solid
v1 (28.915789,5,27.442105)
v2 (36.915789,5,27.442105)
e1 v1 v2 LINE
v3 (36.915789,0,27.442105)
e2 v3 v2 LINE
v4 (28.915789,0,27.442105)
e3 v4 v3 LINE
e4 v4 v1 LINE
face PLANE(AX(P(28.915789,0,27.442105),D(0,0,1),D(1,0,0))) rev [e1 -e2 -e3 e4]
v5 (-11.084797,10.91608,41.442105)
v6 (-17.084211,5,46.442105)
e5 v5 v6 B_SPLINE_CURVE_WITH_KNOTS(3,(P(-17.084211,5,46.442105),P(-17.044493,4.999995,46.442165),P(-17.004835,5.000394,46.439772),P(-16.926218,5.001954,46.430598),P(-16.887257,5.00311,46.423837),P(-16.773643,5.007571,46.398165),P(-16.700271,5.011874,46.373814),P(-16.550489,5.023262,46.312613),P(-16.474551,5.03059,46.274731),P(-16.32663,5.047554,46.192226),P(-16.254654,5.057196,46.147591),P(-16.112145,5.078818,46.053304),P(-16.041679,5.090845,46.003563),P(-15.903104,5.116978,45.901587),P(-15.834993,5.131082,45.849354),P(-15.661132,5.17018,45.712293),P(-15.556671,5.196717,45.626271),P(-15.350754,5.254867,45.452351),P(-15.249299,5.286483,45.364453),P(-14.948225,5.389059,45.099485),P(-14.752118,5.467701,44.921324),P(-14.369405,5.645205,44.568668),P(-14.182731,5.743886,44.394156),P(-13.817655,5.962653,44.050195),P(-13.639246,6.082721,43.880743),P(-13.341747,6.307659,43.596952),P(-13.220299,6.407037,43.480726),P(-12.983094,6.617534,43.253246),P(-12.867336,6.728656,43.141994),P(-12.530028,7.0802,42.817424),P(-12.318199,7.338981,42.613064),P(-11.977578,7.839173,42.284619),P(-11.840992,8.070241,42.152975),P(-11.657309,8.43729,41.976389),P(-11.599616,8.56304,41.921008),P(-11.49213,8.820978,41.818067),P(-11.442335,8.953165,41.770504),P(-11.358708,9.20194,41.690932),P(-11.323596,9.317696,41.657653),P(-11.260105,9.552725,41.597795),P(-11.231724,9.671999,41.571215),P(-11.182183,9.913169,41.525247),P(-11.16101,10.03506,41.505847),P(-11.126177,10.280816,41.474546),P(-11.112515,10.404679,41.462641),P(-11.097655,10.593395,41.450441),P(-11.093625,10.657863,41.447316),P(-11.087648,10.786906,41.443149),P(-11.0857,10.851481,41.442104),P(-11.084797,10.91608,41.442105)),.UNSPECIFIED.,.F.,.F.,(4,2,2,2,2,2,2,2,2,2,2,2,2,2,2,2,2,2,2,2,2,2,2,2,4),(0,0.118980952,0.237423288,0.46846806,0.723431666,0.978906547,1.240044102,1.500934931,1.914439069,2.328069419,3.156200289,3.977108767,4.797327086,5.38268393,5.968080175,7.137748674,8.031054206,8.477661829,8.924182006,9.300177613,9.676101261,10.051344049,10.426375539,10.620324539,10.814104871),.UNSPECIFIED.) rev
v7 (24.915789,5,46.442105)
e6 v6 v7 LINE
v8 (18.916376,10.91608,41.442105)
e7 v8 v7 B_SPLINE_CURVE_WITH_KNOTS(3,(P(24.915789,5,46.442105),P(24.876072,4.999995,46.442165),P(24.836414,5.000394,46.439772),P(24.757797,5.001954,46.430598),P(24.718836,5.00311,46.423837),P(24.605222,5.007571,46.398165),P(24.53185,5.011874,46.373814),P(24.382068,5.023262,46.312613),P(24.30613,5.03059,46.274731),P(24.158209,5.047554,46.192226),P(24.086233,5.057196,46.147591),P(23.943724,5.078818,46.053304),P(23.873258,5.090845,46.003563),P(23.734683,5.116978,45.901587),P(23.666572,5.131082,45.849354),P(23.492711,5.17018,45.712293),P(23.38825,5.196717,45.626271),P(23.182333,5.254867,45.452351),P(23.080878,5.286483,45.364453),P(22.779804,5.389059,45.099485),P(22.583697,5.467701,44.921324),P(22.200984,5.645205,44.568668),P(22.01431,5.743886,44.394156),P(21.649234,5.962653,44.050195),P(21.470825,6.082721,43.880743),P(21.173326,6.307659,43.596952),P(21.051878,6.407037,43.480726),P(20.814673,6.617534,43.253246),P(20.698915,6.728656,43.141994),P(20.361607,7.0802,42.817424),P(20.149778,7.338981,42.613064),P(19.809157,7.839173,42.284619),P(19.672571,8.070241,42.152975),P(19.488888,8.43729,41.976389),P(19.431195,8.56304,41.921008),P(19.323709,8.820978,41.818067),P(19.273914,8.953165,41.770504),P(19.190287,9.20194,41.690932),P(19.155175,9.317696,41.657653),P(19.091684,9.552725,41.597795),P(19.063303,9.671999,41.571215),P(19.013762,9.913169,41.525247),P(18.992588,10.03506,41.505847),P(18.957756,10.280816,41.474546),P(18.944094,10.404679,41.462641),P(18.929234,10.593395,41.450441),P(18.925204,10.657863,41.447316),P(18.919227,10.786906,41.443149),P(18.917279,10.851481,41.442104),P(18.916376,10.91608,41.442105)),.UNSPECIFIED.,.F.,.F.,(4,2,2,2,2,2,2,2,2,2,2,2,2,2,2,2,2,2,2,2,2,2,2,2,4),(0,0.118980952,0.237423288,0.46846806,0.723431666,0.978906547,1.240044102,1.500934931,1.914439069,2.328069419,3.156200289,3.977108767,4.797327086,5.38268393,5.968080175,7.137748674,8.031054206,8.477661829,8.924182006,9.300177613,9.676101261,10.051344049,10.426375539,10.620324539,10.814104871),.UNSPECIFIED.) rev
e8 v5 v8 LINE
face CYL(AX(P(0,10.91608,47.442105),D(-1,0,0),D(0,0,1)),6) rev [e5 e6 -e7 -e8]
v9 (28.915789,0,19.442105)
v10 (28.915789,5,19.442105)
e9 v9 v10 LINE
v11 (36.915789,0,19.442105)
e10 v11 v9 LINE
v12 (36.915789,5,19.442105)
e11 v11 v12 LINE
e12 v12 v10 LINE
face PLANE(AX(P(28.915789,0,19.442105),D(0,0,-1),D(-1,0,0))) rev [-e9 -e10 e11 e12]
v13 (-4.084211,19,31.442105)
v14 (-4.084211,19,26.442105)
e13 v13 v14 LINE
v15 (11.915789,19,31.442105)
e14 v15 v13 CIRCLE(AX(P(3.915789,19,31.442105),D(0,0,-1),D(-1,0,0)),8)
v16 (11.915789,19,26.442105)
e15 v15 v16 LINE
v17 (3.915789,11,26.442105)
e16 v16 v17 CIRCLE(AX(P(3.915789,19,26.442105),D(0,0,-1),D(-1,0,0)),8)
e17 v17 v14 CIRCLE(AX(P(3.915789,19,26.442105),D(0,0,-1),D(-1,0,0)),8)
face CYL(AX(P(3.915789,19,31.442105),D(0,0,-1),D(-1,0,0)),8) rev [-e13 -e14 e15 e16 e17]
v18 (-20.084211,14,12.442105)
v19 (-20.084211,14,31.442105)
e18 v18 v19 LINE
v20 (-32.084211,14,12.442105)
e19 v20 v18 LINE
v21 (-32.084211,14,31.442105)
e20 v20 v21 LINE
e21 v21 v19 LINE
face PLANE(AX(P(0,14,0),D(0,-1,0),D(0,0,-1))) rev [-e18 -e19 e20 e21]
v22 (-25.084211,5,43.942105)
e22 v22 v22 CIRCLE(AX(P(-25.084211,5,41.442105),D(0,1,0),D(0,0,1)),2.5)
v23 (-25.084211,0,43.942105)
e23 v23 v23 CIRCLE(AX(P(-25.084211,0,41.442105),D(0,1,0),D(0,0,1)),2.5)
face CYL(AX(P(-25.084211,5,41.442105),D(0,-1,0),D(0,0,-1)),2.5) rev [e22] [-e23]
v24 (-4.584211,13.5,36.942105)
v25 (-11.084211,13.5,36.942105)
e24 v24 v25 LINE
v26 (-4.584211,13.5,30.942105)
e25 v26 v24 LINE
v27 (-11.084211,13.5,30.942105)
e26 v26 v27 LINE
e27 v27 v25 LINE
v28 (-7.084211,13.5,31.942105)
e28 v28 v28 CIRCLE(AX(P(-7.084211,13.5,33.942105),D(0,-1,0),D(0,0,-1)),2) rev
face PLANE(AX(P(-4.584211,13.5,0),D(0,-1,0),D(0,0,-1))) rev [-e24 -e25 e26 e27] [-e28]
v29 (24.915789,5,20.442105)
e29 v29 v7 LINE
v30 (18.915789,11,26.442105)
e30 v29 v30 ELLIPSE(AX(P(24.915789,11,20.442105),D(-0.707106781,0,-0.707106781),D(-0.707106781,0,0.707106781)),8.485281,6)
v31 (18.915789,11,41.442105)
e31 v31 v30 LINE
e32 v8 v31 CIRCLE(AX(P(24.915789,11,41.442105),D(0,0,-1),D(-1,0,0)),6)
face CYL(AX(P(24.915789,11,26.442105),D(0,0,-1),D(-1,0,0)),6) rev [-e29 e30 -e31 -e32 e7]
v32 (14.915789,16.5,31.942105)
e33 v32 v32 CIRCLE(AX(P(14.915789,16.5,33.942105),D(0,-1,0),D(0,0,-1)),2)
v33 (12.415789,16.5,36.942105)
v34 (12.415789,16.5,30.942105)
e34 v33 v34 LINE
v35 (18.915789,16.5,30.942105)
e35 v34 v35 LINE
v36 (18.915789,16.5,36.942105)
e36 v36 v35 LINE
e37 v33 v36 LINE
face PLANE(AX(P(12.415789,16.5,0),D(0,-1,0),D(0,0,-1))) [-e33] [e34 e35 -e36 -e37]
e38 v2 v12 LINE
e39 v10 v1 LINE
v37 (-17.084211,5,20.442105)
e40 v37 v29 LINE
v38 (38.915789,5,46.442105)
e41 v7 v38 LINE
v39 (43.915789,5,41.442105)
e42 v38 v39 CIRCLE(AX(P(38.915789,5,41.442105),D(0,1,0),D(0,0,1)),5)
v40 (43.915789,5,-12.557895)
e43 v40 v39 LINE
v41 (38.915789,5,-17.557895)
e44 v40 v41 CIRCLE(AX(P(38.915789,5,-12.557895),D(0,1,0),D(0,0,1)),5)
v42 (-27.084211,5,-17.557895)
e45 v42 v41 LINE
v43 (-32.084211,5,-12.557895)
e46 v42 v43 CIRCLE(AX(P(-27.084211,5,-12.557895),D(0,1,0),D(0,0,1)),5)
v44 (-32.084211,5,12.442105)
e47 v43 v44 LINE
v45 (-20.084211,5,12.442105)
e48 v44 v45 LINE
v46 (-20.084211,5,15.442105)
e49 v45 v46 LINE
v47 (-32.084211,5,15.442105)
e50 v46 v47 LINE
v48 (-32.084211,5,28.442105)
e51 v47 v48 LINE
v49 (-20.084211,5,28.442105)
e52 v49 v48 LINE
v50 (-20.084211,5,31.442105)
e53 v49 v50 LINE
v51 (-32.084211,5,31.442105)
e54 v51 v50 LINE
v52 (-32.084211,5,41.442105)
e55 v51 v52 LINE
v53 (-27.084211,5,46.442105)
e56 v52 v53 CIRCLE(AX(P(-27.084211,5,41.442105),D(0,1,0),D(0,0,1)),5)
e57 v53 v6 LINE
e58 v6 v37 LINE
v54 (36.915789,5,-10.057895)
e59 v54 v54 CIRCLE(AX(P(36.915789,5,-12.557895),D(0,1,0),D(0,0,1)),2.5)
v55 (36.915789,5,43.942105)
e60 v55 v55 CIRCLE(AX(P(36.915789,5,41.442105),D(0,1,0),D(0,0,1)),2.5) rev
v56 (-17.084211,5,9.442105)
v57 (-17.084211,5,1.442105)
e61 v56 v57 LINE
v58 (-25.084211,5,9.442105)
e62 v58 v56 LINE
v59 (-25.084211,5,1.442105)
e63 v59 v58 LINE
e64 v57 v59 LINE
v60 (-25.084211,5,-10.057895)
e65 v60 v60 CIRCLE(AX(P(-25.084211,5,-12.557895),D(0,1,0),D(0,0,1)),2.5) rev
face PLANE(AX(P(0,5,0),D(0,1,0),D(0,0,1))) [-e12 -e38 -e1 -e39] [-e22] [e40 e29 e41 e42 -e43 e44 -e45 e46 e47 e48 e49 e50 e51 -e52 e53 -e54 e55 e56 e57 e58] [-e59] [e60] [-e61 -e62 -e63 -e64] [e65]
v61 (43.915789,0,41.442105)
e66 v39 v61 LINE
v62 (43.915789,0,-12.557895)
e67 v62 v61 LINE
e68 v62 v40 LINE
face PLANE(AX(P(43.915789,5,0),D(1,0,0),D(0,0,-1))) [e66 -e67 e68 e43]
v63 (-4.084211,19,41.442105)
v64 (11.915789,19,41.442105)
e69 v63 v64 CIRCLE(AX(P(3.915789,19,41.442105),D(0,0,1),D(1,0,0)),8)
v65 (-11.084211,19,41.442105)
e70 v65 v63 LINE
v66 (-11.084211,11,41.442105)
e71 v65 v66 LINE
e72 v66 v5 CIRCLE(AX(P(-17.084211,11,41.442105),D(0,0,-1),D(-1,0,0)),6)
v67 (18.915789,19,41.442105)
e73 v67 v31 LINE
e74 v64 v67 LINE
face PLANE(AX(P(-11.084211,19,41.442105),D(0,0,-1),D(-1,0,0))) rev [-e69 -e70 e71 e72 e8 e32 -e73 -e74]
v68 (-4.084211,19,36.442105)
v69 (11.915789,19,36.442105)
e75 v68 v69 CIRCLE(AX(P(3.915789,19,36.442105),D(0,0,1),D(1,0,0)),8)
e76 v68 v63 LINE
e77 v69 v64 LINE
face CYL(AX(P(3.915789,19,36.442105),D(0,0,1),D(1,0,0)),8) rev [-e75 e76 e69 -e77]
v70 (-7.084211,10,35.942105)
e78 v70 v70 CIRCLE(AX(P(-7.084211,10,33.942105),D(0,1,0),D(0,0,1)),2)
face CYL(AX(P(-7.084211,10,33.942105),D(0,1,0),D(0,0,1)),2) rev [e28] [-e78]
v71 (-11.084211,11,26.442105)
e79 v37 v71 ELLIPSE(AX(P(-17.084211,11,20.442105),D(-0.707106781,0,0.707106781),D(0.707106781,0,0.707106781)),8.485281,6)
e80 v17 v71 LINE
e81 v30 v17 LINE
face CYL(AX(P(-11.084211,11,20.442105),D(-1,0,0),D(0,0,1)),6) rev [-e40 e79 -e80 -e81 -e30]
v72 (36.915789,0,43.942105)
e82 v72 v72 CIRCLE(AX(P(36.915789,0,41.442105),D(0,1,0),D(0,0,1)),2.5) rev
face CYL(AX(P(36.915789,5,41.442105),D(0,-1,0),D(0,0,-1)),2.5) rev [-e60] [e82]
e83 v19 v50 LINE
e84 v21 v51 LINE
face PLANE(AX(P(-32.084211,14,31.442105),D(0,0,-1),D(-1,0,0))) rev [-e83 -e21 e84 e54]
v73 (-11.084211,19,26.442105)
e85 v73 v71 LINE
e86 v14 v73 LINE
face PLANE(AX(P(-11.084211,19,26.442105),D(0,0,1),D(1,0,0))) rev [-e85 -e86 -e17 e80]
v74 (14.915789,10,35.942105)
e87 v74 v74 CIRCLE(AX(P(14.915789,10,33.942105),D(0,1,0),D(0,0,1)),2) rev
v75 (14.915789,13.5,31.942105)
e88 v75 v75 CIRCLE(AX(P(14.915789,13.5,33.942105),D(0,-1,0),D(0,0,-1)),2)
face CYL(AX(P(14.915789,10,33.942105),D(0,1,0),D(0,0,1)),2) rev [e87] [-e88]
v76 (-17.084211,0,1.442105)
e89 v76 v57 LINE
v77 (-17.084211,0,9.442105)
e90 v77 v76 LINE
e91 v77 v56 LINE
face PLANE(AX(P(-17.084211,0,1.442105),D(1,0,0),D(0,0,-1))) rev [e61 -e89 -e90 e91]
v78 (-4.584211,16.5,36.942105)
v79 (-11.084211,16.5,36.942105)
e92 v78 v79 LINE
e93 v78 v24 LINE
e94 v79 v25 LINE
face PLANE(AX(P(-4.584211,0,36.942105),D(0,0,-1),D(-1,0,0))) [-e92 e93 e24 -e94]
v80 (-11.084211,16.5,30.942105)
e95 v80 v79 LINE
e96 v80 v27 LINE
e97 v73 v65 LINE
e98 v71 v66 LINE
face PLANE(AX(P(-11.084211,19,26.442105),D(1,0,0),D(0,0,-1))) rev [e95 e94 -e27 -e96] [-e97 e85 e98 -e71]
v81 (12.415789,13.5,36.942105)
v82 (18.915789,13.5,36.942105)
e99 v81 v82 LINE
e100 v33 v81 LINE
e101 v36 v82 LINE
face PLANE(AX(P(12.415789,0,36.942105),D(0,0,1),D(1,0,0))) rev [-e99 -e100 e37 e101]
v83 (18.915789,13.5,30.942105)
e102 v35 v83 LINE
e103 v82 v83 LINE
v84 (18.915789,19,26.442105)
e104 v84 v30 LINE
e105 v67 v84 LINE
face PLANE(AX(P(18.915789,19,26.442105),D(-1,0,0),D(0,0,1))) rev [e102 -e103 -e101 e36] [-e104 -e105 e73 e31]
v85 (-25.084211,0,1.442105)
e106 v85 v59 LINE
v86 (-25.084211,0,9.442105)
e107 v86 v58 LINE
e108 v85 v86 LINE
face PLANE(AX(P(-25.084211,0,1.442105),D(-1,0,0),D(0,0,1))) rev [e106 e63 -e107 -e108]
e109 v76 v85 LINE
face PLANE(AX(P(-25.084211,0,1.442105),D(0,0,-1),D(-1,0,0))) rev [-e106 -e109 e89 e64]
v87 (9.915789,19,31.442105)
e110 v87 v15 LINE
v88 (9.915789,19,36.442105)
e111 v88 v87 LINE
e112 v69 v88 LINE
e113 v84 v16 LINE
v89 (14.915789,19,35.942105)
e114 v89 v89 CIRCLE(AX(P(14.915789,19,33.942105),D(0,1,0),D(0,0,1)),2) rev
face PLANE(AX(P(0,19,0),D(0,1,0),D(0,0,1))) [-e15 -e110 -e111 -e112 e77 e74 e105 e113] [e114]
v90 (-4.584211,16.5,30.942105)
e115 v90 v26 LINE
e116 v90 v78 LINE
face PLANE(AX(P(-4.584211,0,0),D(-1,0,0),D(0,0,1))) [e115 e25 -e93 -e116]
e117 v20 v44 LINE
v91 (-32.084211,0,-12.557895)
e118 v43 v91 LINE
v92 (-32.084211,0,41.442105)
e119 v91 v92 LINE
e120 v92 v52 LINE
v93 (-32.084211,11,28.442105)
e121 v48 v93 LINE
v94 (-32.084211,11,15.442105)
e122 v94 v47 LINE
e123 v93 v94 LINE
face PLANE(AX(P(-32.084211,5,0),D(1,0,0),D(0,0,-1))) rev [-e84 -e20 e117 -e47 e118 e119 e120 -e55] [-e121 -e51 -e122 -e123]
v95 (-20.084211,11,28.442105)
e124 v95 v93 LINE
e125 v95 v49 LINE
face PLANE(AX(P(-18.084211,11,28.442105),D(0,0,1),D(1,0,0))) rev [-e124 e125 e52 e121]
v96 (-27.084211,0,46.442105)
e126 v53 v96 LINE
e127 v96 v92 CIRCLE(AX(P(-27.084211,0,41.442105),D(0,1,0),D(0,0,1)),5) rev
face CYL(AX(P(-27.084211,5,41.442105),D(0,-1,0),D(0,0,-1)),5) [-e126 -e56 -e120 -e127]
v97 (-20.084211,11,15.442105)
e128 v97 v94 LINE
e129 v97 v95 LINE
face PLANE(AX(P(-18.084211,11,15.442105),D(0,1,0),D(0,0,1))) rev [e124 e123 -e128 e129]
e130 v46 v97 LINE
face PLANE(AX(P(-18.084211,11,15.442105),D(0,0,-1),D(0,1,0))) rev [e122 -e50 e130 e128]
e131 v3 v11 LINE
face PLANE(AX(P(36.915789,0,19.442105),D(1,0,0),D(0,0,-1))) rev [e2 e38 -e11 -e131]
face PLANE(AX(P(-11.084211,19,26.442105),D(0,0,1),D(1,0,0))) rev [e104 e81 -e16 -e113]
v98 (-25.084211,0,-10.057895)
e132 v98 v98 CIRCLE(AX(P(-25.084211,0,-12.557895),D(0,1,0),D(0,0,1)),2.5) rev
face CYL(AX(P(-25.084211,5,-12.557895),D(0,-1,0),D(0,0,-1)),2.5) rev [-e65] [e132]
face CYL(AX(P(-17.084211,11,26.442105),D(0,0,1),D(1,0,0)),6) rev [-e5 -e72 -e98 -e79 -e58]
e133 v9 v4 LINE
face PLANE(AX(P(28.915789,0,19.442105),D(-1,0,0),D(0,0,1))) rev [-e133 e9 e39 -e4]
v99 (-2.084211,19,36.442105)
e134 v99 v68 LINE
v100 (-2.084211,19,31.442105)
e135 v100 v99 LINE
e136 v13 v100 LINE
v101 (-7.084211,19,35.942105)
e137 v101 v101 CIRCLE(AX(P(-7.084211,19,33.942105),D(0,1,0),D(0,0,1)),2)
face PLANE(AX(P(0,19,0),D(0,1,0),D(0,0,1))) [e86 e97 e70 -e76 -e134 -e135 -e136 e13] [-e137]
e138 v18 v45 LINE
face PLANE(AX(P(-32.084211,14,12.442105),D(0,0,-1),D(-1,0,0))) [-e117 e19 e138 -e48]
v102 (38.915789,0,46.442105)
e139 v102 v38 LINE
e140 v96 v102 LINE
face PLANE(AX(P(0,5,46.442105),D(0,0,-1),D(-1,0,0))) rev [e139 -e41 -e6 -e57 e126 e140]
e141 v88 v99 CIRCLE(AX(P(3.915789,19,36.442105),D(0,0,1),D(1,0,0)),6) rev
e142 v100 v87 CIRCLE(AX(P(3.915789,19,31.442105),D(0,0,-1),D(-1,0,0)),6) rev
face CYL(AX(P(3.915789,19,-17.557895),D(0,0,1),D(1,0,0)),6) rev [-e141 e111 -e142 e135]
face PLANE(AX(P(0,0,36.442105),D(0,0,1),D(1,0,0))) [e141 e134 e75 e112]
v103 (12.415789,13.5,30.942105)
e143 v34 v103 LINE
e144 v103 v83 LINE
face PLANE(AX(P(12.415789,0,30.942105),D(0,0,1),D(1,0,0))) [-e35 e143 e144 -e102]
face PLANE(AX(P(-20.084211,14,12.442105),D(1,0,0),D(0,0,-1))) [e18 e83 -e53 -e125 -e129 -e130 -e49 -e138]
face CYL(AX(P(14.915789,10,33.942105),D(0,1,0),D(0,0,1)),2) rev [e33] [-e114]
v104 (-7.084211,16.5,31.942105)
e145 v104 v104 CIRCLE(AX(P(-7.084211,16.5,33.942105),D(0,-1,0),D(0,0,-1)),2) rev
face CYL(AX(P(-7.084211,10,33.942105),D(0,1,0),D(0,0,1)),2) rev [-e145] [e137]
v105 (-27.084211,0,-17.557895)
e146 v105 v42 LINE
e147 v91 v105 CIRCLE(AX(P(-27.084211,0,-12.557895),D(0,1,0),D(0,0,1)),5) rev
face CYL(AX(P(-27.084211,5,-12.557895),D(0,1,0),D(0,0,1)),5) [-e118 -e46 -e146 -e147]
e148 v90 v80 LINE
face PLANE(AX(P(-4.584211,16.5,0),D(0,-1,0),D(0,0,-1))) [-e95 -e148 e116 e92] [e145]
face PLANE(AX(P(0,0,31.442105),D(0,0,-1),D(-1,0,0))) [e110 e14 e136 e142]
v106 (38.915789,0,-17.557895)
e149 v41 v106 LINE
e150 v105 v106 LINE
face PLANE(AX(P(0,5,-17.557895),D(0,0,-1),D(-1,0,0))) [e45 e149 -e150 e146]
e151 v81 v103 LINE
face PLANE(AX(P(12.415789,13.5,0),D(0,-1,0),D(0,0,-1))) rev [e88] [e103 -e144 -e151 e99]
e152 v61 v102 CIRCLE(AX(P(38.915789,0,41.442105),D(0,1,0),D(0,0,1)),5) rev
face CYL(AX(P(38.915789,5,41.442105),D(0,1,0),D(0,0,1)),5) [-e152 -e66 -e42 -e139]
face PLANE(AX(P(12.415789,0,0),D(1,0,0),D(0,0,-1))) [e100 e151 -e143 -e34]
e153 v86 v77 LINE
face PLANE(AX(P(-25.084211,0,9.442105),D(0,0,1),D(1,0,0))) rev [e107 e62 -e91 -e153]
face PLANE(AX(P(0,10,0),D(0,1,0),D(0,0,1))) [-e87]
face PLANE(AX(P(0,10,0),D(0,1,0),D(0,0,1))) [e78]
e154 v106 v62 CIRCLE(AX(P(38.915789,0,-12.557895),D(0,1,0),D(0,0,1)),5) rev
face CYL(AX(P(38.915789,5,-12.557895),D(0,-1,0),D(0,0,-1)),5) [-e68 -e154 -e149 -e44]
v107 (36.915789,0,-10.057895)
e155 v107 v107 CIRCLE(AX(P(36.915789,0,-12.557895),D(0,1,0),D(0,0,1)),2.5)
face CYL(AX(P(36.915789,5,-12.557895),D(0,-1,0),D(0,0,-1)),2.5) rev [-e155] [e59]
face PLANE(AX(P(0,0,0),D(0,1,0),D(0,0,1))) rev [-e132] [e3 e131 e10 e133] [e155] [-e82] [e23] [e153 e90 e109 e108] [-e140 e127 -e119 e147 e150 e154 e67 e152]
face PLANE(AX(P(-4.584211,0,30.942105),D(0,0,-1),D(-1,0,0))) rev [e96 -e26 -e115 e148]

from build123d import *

# Parameters (mm, degrees)
SKETCH1_W           = 76
SKETCH1_H           = 64
SKETCH1_R           = 2.5
BOSS_EXTRUDE1_DEPTH = 5
SKETCH2_W           = 30
SKETCH2_H           = 15
BOSS_EXTRUDE2_DEPTH = 14
SKETCH3_R           = 6
CUT_EXTRUDE1_DEPTH  = 76.964442768
CUT_EXTRUDE2_DEPTH  = 5
CUT_EXTRUDE3_START  = -5
CUT_EXTRUDE3_DEPTH  = 5
FILLET1_R           = 6
SKETCH6_W           = 8
SKETCH6_H           = 8
CUT_EXTRUDE4_DEPTH  = 66.432910035
SKETCH7_W           = 12
SKETCH7_H           = 19
BOSS_EXTRUDE3_DEPTH = 9
SKETCH9_W           = 13
SKETCH9_H           = 6
CUT_EXTRUDE5_DEPTH  = 14
FILLET3_R           = 5
CUT_EXTRUDE6_DEPTH  = 9
SKETCH11_W          = 3
SKETCH11_H          = 1.5
CUT_EXTRUDE7_DEPTH  = 6.5
SKETCH13_W          = 3
SKETCH13_H          = 1.5
CUT_EXTRUDE8_DEPTH  = 6.5


with BuildPart() as part:
    # Sketch1 → Boss-Extrude1 (new body)
    with BuildSketch(Plane(origin=(0, 0, 0), x_dir=(1, 0, 0), z_dir=(0, 1, 0))):
        with Locations((5.915789474, -14.442105263)):
            Rectangle(SKETCH1_W, SKETCH1_H)
        with Locations(Location((36.915789474, 12.557894737, 0), (0, 0, 270))):
            Circle(SKETCH1_R, mode=Mode.SUBTRACT)
        with Locations(Location((-25.084210526, 12.557894737, 0), (0, 0, 270))):
            Circle(SKETCH1_R, mode=Mode.SUBTRACT)
        with Locations(Location((36.915789474, -41.442105263, 0), (0, 0, 270))):
            Circle(SKETCH1_R, mode=Mode.SUBTRACT)
        with Locations(Location((-25.084210526, -41.442105263, 0), (0, 0, 270))):
            Circle(SKETCH1_R, mode=Mode.SUBTRACT)
    extrude(amount=BOSS_EXTRUDE1_DEPTH)

    # Sketch2 → Boss-Extrude2 (add)
    with BuildSketch(Plane(origin=(0, 5, 0), x_dir=(1, 0, 0), z_dir=(0, 1, 0))):
        with Locations((3.915789474, -33.942105263)):
            Rectangle(SKETCH2_W, SKETCH2_H)
    extrude(amount=BOSS_EXTRUDE2_DEPTH)

    # Sketch3 → Cut-Extrude1 (cut, through all)
    with BuildSketch(Plane.XY.offset(41.442105263)):
        with Locations((3.915789474, 19)):
            Circle(SKETCH3_R)
    extrude(amount=-CUT_EXTRUDE1_DEPTH, mode=Mode.SUBTRACT)

    # Sketch4 → Cut-Extrude2 (cut)
    with BuildSketch(Plane.XY.offset(41.442105263)):
        with BuildLine():
            ThreePointArc((9.915789474, 19), (3.915789474, 13), (-2.084210526, 19))
            Line((-2.084210526, 19), (-4.084210526, 19))
            ThreePointArc((-4.084210526, 19), (3.915789474, 11), (11.915789474, 19))
            Line((11.915789474, 19), (9.915789474, 19))
        make_face()
    extrude(amount=-CUT_EXTRUDE2_DEPTH, mode=Mode.SUBTRACT)

    # Sketch5 → Cut-Extrude3 (cut)
    with BuildSketch(Plane(origin=(0, 0, 26.442105263), x_dir=(-1, 0, 0), z_dir=(0, 0, -1)).offset(CUT_EXTRUDE3_START)):
        with BuildLine():
            ThreePointArc((2.084210526, 19), (-3.915789474, 13), (-9.915789474, 19))
            Line((-9.915789474, 19), (-11.915789474, 19))
            ThreePointArc((-11.915789474, 19), (-3.915789474, 11), (4.084210526, 19))
            Line((4.084210526, 19), (2.084210526, 19))
        make_face()
    extrude(amount=CUT_EXTRUDE3_DEPTH, mode=Mode.SUBTRACT)

    # Fillet1
    # the kernel refuses this fillet: 6 mm, written as the material it adds along each edge
    with BuildSketch(Plane(origin=(-11.084210526, 5, 41.442105263), x_dir=(-1, 0, 0), z_dir=(0, 0, -1)), Plane(origin=(18.915789474, 5, 26.442105263), x_dir=(1, 0, 0), z_dir=(0, 0, 1))) as fillet1_piece_1:
        with BuildLine():
            CenterArc((FILLET1_R, FILLET1_R), FILLET1_R, 180, 90)
            Line((0, FILLET1_R), (-FILLET1_R * 0.02, FILLET1_R))
            Line((-FILLET1_R * 0.02, FILLET1_R), (-FILLET1_R * 0.02, -FILLET1_R * 0.02))
            Line((-FILLET1_R * 0.02, -FILLET1_R * 0.02), (FILLET1_R, -FILLET1_R * 0.02))
            Line((FILLET1_R, -FILLET1_R * 0.02), (FILLET1_R, 0))
        make_face()
    extrude(amount=15)
    with BuildSketch(Plane(origin=(18.915789474, 5, 41.442105263), x_dir=(0, 0, 1), z_dir=(-1, 0, 0))) as fillet1_piece_2:
        with BuildLine():
            CenterArc((6, 5.916079783), FILLET1_R, 180, 80.405931773)
            Line((0, 5.916079783), (-0.12, 5.916079783))
            Line((-0.12, 5.916079783), (-0.12, 0))
            Line((-0.12, 0), (0, -0.12))
            ThreePointArc((0, -0.12), (2.5, -0.12), (4.98, -0.118321596))
            Line((4.98, -0.118321596), (5, 0))
        make_face()
    extrude(amount=30)
    with BuildSketch(Plane(origin=(-11.084210526, 5, 26.442105263), x_dir=(0, 0, -1), z_dir=(1, 0, 0))) as fillet1_piece_3:
        with BuildLine():
            CenterArc((FILLET1_R, FILLET1_R), FILLET1_R, 180, 90)
            Line((0, FILLET1_R), (-FILLET1_R * 0.02, FILLET1_R))
            Line((-FILLET1_R * 0.02, FILLET1_R), (-FILLET1_R * 0.02, -FILLET1_R * 0.02))
            Line((-FILLET1_R * 0.02, -FILLET1_R * 0.02), (FILLET1_R, -FILLET1_R * 0.02))
            Line((FILLET1_R, -FILLET1_R * 0.02), (FILLET1_R, 0))
        make_face()
    extrude(amount=30)
    with BuildSketch(Plane(origin=(18.915789474, 5, 41.442105263), x_dir=(0, 0, 1), z_dir=(-1, 0, 0))) as fillet1_piece_4a_section:
        with BuildLine():
            CenterArc((6, 5.916079783), FILLET1_R, 180, 80.405931773)
            Line((0, 5.916079783), (-0.12, 5.916079783))
            Line((-0.12, 5.916079783), (-0.12, 0))
            Line((-0.12, 0), (0, -0.12))
            ThreePointArc((0, -0.12), (2.5, -0.12), (4.98, -0.118321596))
            Line((4.98, -0.118321596), (5, 0))
        make_face()
    fillet1_piece_4a = extrude(amount=44.790199458, mode=Mode.PRIVATE)
    fillet1_piece_4a = fillet1_piece_4a - Plane(origin=(-25.084210526, 6.312351874, 41.442105263), x_dir=(0, 0, 1), z_dir=(0, -1, 0)) * Cylinder(2.5, 114, mode=Mode.PRIVATE)
    fillet1_piece_4a = split(fillet1_piece_4a, bisect_by=Plane(origin=(-11.084210526, 6.312351874, 42.775348467), z_dir=(-1, 0, 0)), keep=Keep.TOP, mode=Mode.PRIVATE)
    with BuildSketch(Plane(origin=(-11.084210526, 5, 56.442105263), x_dir=(-1, 0, 0), z_dir=(0, 0, -1))) as fillet1_piece_4b_section:
        with BuildLine():
            CenterArc((FILLET1_R, FILLET1_R), FILLET1_R, 180, 90)
            Line((0, FILLET1_R), (-FILLET1_R * 0.02, FILLET1_R))
            Line((-FILLET1_R * 0.02, FILLET1_R), (-FILLET1_R * 0.02, -FILLET1_R * 0.02))
            Line((-FILLET1_R * 0.02, -FILLET1_R * 0.02), (FILLET1_R, -FILLET1_R * 0.02))
            Line((FILLET1_R, -FILLET1_R * 0.02), (FILLET1_R, 0))
        make_face()
    fillet1_piece_4b = extrude(amount=30, mode=Mode.PRIVATE)
    fillet1_piece_4b = split(fillet1_piece_4b, bisect_by=Plane(origin=(-12.442581212, 6.358370686, 46.442105263), z_dir=(0, 0, -1)), keep=Keep.TOP, mode=Mode.PRIVATE)
    fillet1_piece_4b = split(fillet1_piece_4b, bisect_by=Plane(origin=(-12.442581212, 6.358370686, 41.442105263), z_dir=(0, 0, 1)), keep=Keep.TOP, mode=Mode.PRIVATE)
    fillet1_piece_4 = fillet1_piece_4a & fillet1_piece_4b
    add(fillet1_piece_4)
    with BuildSketch(Plane(origin=(-26.084210526, 5, 26.442105263), x_dir=(0, 0, -1), z_dir=(1, 0, 0))) as fillet1_piece_5a_section:
        with BuildLine():
            CenterArc((FILLET1_R, FILLET1_R), FILLET1_R, 180, 90)
            Line((0, FILLET1_R), (-FILLET1_R * 0.02, FILLET1_R))
            Line((-FILLET1_R * 0.02, FILLET1_R), (-FILLET1_R * 0.02, -FILLET1_R * 0.02))
            Line((-FILLET1_R * 0.02, -FILLET1_R * 0.02), (FILLET1_R, -FILLET1_R * 0.02))
            Line((FILLET1_R, -FILLET1_R * 0.02), (FILLET1_R, 0))
        make_face()
    fillet1_piece_5a = extrude(amount=45, mode=Mode.PRIVATE)
    fillet1_piece_5a = split(fillet1_piece_5a, bisect_by=Plane(origin=(-11.084210526, 6.358370686, 25.083734578), z_dir=(-1, 0, 0)), keep=Keep.TOP, mode=Mode.PRIVATE)
    with BuildSketch(Plane(origin=(-11.084210526, 5, 41.442105263), x_dir=(-1, 0, 0), z_dir=(0, 0, -1))) as fillet1_piece_5b_section:
        with BuildLine():
            CenterArc((FILLET1_R, FILLET1_R), FILLET1_R, 180, 90)
            Line((0, FILLET1_R), (-FILLET1_R * 0.02, FILLET1_R))
            Line((-FILLET1_R * 0.02, FILLET1_R), (-FILLET1_R * 0.02, -FILLET1_R * 0.02))
            Line((-FILLET1_R * 0.02, -FILLET1_R * 0.02), (FILLET1_R, -FILLET1_R * 0.02))
            Line((FILLET1_R, -FILLET1_R * 0.02), (FILLET1_R, 0))
        make_face()
    fillet1_piece_5b = extrude(amount=30, mode=Mode.PRIVATE)
    fillet1_piece_5b = split(fillet1_piece_5b, bisect_by=Plane(origin=(-12.442581212, 6.358370686, 26.442105263), z_dir=(0, 0, -1)), keep=Keep.TOP, mode=Mode.PRIVATE)
    fillet1_piece_5 = fillet1_piece_5a & fillet1_piece_5b
    add(fillet1_piece_5)
    with BuildSketch(Plane(origin=(18.915789474, 5, 26.442105263), x_dir=(1, 0, 0), z_dir=(0, 0, 1))) as fillet1_piece_6a_section:
        with BuildLine():
            CenterArc((FILLET1_R, FILLET1_R), FILLET1_R, 180, 90)
            Line((0, FILLET1_R), (-FILLET1_R * 0.02, FILLET1_R))
            Line((-FILLET1_R * 0.02, FILLET1_R), (-FILLET1_R * 0.02, -FILLET1_R * 0.02))
            Line((-FILLET1_R * 0.02, -FILLET1_R * 0.02), (FILLET1_R, -FILLET1_R * 0.02))
            Line((FILLET1_R, -FILLET1_R * 0.02), (FILLET1_R, 0))
        make_face()
    fillet1_piece_6a = extrude(amount=30, mode=Mode.PRIVATE)
    fillet1_piece_6a = split(fillet1_piece_6a, bisect_by=Plane(origin=(20.274160159, 6.358370686, 46.442105263), z_dir=(0, 0, -1)), keep=Keep.TOP, mode=Mode.PRIVATE)
    fillet1_piece_6a = split(fillet1_piece_6a, bisect_by=Plane(origin=(20.274160159, 6.358370686, 41.442105263), z_dir=(0, 0, 1)), keep=Keep.TOP, mode=Mode.PRIVATE)
    with BuildSketch(Plane(origin=(33.705988931, 5, 41.442105263), x_dir=(0, 0, 1), z_dir=(-1, 0, 0))) as fillet1_piece_6b_section:
        with BuildLine():
            CenterArc((6, 5.916079783), FILLET1_R, 180, 80.405931773)
            Line((0, 5.916079783), (-0.12, 5.916079783))
            Line((-0.12, 5.916079783), (-0.12, 0))
            Line((-0.12, 0), (0, -0.12))
            ThreePointArc((0, -0.12), (2.5, -0.12), (4.98, -0.118321596))
            Line((4.98, -0.118321596), (5, 0))
        make_face()
    fillet1_piece_6b = extrude(amount=44.790199458, mode=Mode.PRIVATE)
    fillet1_piece_6b = split(fillet1_piece_6b, bisect_by=Plane(origin=(18.915789474, 6.37196406, 42.676023134), z_dir=(1, 0, 0)), keep=Keep.TOP, mode=Mode.PRIVATE)
    fillet1_piece_6 = fillet1_piece_6a & fillet1_piece_6b
    add(fillet1_piece_6)
    with BuildSketch(Plane(origin=(-11.084210526, 5, 26.442105263), x_dir=(0, 0, -1), z_dir=(1, 0, 0))) as fillet1_piece_7a_section:
        with BuildLine():
            CenterArc((FILLET1_R, FILLET1_R), FILLET1_R, 180, 90)
            Line((0, FILLET1_R), (-FILLET1_R * 0.02, FILLET1_R))
            Line((-FILLET1_R * 0.02, FILLET1_R), (-FILLET1_R * 0.02, -FILLET1_R * 0.02))
            Line((-FILLET1_R * 0.02, -FILLET1_R * 0.02), (FILLET1_R, -FILLET1_R * 0.02))
            Line((FILLET1_R, -FILLET1_R * 0.02), (FILLET1_R, 0))
        make_face()
    fillet1_piece_7a = extrude(amount=45, mode=Mode.PRIVATE)
    fillet1_piece_7a = split(fillet1_piece_7a, bisect_by=Plane(origin=(18.915789474, 6.358370686, 25.083734578), z_dir=(1, 0, 0)), keep=Keep.TOP, mode=Mode.PRIVATE)
    with BuildSketch(Plane(origin=(18.915789474, 5, 11.442105263), x_dir=(1, 0, 0), z_dir=(0, 0, 1))) as fillet1_piece_7b_section:
        with BuildLine():
            CenterArc((FILLET1_R, FILLET1_R), FILLET1_R, 180, 90)
            Line((0, FILLET1_R), (-FILLET1_R * 0.02, FILLET1_R))
            Line((-FILLET1_R * 0.02, FILLET1_R), (-FILLET1_R * 0.02, -FILLET1_R * 0.02))
            Line((-FILLET1_R * 0.02, -FILLET1_R * 0.02), (FILLET1_R, -FILLET1_R * 0.02))
            Line((FILLET1_R, -FILLET1_R * 0.02), (FILLET1_R, 0))
        make_face()
    fillet1_piece_7b = extrude(amount=30, mode=Mode.PRIVATE)
    fillet1_piece_7b = split(fillet1_piece_7b, bisect_by=Plane(origin=(20.274160159, 6.358370686, 26.442105263), z_dir=(0, 0, -1)), keep=Keep.TOP, mode=Mode.PRIVATE)
    fillet1_piece_7 = fillet1_piece_7a & fillet1_piece_7b
    add(fillet1_piece_7)

    # Sketch6 → Cut-Extrude4 (cut, through all)
    with BuildSketch(Plane(origin=(0, 5, 0), x_dir=(1, 0, 0), z_dir=(0, 1, 0))):
        with Locations((32.915789474, -23.442105263)):
            Rectangle(SKETCH6_W, SKETCH6_H)
        with Locations((-21.084210526, -5.442105263)):
            Rectangle(SKETCH6_W, SKETCH6_H)
    extrude(amount=-CUT_EXTRUDE4_DEPTH, mode=Mode.SUBTRACT)

    # Sketch7 → Boss-Extrude3 (add)
    with BuildSketch(Plane(origin=(0, 5, 0), x_dir=(1, 0, 0), z_dir=(0, 1, 0))):
        with Locations((-26.084210526, -21.942105263)):
            Rectangle(SKETCH7_W, SKETCH7_H)
    extrude(amount=BOSS_EXTRUDE3_DEPTH)

    # Sketch9 → Cut-Extrude5 (cut)
    with BuildSketch(Plane.ZY.offset(32.084210526)):
        with Locations((21.942105263, 8)):
            Rectangle(SKETCH9_W, SKETCH9_H)
    extrude(amount=-CUT_EXTRUDE5_DEPTH, mode=Mode.SUBTRACT)

    # Fillet3
    fillet3_edges = [part.edges().sort_by_distance(p)[0] for p in [
        (-32.084210526, 2.5, -17.557894737),
        (43.915789474, 2.5, -17.557894737),
        (43.915789474, 2.5, 46.442105263),
        (-32.084210526, 2.5, 46.442105263),
    ]]
    fillet(fillet3_edges, radius=FILLET3_R)

    # Sketch10 → Cut-Extrude6 (cut)
    with BuildSketch(Plane(origin=(0, 19, 0), x_dir=(1, 0, 0), z_dir=(0, 1, 0))):
        with BuildLine():
            ThreePointArc((-5.084210526, -33.942105263), (-7.084210526, -31.942105263), (-9.084210526, -33.942105263))
            Line((-9.084210526, -33.942105263), (-5.084210526, -33.942105263))
        make_face()
        with BuildLine():
            Line((-5.084210526, -33.942105263), (-9.084210526, -33.942105263))
            ThreePointArc((-9.084210526, -33.942105263), (-7.084210526, -35.942105263), (-5.084210526, -33.942105263))
        make_face()
        with BuildLine():
            ThreePointArc((16.915789474, -33.942105263), (14.915789474, -31.942105263), (12.915789474, -33.942105263))
            Line((12.915789474, -33.942105263), (16.915789474, -33.942105263))
        make_face()
        with BuildLine():
            Line((16.915789474, -33.942105263), (12.915789474, -33.942105263))
            ThreePointArc((12.915789474, -33.942105263), (14.915789474, -35.942105263), (16.915789474, -33.942105263))
        make_face()
    extrude(amount=-CUT_EXTRUDE6_DEPTH, mode=Mode.SUBTRACT)

    # Sketch11 → Cut-Extrude7 (cut)
    with BuildSketch(Plane.ZY.offset(11.084210526)):
        with Locations((32.442105263, 15.75)):
            Rectangle(SKETCH11_W, SKETCH11_H)
        with Locations((35.442105263, 15.75)):
            Rectangle(SKETCH11_W, SKETCH11_H)
        with Locations((35.442105263, 14.25)):
            Rectangle(SKETCH11_W, SKETCH11_H)
        with Locations((32.442105263, 14.25)):
            Rectangle(SKETCH11_W, SKETCH11_H)
    extrude(amount=-CUT_EXTRUDE7_DEPTH, mode=Mode.SUBTRACT)

    # Sketch13 → Cut-Extrude8 (cut)
    with BuildSketch(Plane(origin=(18.915789474, 0, 0), x_dir=(0, 0, -1), z_dir=(1, 0, 0))):
        with Locations((-35.442105263, 15.75)):
            Rectangle(SKETCH13_W, SKETCH13_H)
        with Locations((-32.442105263, 15.75)):
            Rectangle(SKETCH13_W, SKETCH13_H)
        with Locations((-32.442105263, 14.25)):
            Rectangle(SKETCH13_W, SKETCH13_H)
        with Locations((-35.442105263, 14.25)):
            Rectangle(SKETCH13_W, SKETCH13_H)
    extrude(amount=-CUT_EXTRUDE8_DEPTH, mode=Mode.SUBTRACT)


solid = part.part
